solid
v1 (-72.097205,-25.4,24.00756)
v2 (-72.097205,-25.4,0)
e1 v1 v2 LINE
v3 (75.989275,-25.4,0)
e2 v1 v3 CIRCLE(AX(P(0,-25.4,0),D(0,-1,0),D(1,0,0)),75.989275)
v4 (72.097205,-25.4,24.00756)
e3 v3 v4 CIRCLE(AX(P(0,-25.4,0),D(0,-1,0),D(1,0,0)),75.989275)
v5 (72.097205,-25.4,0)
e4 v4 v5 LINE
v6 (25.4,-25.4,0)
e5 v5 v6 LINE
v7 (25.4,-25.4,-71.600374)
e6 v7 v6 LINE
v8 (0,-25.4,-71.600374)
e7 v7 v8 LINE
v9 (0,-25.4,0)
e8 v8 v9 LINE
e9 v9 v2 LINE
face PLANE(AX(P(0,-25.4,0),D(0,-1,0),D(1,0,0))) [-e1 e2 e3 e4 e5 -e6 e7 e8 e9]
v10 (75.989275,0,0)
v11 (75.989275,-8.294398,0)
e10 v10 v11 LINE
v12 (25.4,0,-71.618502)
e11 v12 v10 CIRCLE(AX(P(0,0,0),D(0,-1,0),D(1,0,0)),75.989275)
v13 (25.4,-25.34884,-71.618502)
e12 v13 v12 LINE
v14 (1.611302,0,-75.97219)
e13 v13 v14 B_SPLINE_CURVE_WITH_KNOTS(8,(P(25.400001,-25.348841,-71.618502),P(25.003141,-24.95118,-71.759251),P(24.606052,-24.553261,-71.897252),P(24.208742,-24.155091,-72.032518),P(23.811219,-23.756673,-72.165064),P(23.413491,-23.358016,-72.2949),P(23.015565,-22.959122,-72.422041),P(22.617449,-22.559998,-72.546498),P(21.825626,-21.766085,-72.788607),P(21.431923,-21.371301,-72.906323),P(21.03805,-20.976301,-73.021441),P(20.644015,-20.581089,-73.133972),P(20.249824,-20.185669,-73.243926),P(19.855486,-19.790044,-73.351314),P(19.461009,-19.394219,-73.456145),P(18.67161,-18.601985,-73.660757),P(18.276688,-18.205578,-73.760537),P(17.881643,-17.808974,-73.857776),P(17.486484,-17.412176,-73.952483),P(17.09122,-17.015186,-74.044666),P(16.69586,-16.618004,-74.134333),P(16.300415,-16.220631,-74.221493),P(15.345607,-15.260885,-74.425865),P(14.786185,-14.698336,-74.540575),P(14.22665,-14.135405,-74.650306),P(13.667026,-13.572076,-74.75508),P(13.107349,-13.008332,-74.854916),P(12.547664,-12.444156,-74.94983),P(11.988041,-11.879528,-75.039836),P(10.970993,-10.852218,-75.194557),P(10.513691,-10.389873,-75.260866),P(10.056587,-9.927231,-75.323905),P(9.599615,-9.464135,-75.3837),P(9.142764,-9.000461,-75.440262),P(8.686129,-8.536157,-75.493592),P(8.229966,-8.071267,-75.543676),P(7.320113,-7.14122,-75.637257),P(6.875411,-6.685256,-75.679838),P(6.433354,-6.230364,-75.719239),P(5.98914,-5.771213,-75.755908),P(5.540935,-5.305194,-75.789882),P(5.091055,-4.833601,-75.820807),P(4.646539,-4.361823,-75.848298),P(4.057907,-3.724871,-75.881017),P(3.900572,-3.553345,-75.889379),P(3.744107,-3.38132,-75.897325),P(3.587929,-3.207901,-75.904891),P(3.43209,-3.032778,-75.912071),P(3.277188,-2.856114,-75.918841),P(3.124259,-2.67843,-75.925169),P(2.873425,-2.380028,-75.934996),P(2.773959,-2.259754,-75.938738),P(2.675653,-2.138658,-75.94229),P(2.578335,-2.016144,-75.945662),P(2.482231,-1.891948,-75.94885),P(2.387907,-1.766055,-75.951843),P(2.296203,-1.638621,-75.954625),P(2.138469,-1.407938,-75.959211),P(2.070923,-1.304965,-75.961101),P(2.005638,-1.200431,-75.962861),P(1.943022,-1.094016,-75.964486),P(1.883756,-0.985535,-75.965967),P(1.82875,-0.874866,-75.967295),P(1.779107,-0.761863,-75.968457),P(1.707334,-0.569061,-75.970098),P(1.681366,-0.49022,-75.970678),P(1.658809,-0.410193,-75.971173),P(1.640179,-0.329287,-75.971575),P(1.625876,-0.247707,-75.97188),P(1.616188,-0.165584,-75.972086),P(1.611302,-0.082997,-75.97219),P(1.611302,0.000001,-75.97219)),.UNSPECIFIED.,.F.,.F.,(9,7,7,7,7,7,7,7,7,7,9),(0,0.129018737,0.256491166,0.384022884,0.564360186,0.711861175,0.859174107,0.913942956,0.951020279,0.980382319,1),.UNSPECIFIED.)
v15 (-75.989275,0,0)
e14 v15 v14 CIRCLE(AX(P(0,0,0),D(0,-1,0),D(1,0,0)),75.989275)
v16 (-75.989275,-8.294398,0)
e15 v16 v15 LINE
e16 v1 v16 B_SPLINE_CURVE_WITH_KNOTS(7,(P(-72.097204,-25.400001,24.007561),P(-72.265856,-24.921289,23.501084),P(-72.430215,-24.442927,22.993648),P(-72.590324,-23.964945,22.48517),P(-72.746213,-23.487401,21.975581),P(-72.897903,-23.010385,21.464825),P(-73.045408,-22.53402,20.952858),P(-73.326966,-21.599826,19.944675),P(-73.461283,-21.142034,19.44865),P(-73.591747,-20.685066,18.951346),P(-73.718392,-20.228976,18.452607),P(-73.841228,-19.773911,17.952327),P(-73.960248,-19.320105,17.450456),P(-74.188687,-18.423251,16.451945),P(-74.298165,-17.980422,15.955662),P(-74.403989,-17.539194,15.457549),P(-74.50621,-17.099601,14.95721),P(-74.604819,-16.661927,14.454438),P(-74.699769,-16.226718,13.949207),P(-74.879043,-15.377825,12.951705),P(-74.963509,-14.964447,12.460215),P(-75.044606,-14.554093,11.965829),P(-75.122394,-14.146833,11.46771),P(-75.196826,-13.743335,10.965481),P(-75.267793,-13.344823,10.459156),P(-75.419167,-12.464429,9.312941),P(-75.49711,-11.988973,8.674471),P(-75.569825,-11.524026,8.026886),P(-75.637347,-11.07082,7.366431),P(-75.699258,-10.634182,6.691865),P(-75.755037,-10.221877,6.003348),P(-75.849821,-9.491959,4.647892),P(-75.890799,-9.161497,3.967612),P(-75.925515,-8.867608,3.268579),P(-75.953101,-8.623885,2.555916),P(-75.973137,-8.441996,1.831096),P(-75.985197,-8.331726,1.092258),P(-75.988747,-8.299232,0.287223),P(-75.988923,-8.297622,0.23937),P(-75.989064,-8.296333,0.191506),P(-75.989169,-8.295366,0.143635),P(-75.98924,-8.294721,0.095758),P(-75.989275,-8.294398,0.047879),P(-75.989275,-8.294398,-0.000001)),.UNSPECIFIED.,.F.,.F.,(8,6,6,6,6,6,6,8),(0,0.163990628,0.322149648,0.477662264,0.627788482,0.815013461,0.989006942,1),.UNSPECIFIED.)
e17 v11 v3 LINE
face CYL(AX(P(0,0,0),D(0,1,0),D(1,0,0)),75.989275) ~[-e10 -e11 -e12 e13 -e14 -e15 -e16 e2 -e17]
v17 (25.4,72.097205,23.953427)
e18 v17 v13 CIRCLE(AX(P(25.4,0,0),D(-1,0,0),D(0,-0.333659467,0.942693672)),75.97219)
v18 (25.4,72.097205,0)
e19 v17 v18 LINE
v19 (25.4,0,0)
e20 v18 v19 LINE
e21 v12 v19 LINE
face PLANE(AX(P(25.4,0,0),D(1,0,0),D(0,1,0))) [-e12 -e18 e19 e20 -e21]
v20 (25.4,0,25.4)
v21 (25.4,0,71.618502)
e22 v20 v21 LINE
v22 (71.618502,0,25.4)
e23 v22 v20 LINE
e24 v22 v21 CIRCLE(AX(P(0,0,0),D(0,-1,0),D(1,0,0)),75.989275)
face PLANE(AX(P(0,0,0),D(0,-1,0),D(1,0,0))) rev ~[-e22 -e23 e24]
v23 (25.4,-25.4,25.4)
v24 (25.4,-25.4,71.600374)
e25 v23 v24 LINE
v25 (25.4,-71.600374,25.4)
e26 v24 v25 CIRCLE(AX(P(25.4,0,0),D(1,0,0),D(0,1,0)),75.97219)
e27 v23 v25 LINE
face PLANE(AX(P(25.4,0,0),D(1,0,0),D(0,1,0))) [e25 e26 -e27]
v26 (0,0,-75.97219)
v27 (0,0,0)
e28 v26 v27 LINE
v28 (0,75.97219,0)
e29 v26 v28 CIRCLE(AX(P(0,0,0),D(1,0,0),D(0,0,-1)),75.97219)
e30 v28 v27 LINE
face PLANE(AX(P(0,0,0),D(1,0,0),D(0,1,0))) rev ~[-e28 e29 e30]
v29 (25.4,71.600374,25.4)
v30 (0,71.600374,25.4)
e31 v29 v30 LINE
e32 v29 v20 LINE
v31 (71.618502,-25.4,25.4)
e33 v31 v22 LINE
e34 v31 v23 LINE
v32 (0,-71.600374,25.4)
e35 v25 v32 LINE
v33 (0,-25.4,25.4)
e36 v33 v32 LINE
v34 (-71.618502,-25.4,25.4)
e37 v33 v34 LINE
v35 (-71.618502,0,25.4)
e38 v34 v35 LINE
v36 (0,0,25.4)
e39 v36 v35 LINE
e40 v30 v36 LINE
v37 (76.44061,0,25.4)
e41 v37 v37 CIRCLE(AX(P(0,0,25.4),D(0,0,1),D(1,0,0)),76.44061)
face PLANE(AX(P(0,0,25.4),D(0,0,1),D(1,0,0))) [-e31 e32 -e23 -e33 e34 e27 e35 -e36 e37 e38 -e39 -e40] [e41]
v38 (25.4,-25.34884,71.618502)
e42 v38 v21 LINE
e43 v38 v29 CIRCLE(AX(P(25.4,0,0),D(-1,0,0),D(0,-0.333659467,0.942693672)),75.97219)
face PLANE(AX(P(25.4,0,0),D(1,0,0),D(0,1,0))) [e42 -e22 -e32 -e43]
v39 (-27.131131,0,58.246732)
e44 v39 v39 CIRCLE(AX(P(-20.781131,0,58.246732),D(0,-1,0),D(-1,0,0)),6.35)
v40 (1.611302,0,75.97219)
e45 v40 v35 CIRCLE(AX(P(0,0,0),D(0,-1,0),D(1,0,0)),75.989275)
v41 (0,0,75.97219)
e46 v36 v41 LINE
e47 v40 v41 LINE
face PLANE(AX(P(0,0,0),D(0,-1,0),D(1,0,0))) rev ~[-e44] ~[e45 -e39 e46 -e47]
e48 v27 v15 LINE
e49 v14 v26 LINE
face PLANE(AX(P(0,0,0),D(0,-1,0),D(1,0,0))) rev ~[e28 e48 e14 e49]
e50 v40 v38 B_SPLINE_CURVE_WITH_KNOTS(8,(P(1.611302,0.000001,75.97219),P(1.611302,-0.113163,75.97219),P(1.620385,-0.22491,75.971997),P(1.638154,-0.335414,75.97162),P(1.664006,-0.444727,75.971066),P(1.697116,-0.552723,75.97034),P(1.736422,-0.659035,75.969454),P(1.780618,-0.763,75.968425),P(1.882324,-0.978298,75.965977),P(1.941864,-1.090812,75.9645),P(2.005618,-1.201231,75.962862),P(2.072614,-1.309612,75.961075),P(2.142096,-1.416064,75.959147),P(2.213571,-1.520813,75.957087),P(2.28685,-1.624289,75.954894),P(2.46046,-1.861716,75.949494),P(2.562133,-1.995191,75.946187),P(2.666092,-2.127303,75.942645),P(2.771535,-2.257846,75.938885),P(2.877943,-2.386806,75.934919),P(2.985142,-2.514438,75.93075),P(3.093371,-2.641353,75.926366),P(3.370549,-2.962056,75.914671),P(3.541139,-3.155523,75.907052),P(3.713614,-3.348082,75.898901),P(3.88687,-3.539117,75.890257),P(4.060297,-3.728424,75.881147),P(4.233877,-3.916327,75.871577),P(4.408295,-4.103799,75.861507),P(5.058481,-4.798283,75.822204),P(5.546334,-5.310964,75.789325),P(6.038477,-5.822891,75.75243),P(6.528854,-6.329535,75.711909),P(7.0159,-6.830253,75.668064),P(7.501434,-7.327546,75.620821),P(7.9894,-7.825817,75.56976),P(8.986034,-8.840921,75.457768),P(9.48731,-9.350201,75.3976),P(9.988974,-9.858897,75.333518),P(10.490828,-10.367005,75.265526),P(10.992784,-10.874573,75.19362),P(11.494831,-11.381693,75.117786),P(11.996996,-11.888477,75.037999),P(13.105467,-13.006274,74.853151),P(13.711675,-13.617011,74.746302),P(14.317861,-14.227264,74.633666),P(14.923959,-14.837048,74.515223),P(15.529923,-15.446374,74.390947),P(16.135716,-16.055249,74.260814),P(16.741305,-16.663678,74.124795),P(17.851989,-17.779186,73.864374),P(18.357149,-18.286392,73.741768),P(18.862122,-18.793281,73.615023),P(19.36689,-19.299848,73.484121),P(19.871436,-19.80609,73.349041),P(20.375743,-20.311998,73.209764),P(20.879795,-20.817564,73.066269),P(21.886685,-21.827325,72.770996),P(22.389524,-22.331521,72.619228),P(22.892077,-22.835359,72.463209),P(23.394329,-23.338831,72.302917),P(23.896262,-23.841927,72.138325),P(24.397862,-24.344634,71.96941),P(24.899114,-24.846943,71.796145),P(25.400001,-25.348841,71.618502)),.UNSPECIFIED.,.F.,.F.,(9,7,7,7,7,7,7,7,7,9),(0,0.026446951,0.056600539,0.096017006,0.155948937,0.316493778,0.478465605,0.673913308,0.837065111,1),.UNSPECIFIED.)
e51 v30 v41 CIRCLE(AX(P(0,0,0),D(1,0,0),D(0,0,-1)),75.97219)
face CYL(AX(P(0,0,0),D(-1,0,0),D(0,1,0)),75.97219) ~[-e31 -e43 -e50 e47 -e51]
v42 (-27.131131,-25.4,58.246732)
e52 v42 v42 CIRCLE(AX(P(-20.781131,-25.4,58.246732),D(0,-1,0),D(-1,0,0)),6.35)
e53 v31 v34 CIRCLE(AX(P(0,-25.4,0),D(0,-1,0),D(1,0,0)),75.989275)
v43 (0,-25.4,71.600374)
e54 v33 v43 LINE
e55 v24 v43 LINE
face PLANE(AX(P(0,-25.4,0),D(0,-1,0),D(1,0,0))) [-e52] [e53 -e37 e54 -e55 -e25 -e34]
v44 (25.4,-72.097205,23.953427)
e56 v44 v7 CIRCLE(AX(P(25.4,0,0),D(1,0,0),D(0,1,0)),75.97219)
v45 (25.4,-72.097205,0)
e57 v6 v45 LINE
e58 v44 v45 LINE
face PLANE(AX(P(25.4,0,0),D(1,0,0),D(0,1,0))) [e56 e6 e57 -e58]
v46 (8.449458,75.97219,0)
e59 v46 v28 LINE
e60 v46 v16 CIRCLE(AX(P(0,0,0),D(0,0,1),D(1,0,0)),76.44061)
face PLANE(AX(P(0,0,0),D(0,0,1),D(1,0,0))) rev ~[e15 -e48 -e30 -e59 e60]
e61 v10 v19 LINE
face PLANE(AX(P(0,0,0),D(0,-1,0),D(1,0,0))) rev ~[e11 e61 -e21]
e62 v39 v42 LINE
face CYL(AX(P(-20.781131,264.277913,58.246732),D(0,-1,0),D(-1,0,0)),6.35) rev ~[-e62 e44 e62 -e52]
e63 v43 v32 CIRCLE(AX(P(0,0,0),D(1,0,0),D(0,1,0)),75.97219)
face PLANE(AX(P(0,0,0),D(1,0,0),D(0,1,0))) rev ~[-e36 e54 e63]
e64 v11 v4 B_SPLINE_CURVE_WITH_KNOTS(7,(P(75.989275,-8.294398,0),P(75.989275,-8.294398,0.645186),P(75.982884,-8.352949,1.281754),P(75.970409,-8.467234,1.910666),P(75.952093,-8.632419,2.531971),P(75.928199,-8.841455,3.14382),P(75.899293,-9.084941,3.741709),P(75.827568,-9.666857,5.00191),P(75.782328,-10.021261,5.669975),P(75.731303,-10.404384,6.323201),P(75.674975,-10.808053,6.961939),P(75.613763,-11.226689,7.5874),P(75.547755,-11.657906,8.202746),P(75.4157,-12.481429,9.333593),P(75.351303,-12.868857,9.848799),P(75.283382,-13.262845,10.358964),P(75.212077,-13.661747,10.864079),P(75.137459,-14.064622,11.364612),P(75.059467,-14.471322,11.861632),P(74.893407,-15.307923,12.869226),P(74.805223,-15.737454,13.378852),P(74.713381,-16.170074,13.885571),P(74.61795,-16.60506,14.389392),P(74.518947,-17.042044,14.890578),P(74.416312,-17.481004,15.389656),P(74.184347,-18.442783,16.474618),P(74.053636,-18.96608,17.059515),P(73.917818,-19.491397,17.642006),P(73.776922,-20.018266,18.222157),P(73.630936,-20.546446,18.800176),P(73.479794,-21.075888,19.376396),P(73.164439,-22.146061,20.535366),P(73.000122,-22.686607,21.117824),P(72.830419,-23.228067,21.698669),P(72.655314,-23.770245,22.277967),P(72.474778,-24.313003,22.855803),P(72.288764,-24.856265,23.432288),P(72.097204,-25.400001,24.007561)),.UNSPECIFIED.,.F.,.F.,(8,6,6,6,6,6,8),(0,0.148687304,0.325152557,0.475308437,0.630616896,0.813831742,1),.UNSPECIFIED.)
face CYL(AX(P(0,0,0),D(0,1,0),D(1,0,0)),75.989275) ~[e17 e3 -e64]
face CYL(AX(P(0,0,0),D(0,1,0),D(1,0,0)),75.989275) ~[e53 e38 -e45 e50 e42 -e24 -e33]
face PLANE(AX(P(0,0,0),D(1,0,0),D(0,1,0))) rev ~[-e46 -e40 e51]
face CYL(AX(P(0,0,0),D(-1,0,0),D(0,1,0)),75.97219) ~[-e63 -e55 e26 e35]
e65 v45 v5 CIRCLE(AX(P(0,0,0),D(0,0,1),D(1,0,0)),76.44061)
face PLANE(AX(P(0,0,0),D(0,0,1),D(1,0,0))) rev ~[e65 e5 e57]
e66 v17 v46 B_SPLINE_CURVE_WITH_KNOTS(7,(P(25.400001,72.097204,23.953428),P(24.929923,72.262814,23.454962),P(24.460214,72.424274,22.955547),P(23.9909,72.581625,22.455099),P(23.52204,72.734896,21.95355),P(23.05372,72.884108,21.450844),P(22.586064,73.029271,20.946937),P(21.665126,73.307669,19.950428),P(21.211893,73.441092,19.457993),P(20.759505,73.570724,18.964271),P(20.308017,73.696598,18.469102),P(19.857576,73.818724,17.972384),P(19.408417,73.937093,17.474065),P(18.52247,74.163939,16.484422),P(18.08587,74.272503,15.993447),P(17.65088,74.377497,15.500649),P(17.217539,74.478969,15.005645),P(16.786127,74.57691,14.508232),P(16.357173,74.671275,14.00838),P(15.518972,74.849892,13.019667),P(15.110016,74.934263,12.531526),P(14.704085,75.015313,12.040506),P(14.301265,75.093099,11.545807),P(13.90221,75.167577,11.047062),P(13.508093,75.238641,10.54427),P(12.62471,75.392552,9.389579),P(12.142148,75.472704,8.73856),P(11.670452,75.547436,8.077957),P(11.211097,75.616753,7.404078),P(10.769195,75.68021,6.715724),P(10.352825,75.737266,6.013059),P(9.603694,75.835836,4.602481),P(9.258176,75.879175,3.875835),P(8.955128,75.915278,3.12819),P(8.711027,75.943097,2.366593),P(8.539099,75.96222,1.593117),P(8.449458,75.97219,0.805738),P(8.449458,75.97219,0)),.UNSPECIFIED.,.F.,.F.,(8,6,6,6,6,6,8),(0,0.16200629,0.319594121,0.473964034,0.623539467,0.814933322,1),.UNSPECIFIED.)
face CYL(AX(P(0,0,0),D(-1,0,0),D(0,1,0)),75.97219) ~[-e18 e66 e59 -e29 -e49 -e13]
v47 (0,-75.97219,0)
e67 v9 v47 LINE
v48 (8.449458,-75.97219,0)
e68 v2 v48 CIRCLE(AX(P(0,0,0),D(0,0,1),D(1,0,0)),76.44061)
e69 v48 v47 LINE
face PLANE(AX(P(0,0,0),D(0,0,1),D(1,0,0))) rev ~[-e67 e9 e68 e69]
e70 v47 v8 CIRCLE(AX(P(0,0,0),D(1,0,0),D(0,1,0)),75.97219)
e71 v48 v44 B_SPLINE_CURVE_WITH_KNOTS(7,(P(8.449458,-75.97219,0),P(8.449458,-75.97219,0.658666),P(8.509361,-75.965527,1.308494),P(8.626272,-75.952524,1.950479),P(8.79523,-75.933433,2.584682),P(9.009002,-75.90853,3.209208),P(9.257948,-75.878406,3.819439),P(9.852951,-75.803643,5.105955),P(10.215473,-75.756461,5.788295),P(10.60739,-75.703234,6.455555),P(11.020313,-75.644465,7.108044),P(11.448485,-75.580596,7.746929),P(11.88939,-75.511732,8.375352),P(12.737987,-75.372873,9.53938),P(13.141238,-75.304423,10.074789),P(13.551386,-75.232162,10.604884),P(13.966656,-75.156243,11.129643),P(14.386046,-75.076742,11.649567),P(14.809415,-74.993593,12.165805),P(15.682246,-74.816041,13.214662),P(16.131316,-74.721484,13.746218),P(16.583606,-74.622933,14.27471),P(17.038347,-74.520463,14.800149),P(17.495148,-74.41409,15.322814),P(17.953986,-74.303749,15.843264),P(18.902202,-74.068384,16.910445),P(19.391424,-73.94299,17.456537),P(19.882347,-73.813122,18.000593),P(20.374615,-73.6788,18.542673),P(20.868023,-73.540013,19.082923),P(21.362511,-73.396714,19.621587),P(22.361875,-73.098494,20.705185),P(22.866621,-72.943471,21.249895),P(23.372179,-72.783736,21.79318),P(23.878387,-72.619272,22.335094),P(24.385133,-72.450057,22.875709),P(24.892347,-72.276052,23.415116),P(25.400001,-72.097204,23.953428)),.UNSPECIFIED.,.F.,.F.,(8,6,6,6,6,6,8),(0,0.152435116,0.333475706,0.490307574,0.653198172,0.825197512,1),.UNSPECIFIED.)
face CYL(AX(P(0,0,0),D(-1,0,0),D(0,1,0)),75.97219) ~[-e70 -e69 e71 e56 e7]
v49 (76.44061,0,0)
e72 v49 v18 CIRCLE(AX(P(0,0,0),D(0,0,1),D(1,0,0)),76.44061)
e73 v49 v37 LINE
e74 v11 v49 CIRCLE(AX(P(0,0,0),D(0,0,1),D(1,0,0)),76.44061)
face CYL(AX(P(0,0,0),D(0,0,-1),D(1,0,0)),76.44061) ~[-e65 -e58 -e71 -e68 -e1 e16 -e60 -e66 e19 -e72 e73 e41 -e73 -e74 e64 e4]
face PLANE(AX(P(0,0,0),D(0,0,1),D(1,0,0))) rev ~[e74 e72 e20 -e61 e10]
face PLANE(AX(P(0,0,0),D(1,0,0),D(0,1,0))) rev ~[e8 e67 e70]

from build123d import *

# Parameters (mm, degrees)
F0_R     = 75.9892747742
F1_DEPTH = 25.4
F2_R     = 75.972189553
F3_DEPTH = 25.4
F4_R     = 76.4406104517
F5_DEPTH = 25.4
F7_D     = 12.7


with BuildPart() as f1:
    # F0 (on Front) → F1 (new body)
    with BuildSketch(Plane.XZ):
        Circle(F0_R)
    extrude(amount=F1_DEPTH)

    # F2 (on Right) → F3 (join)
    with BuildSketch(Plane.YZ):
        Circle(F2_R)
    extrude(amount=F3_DEPTH)

    # F4 (on Top) → F5 (join)
    with BuildSketch(Plane.XY):
        Circle(F4_R)
    extrude(amount=F5_DEPTH)

    # F7 (through all)
    with Locations(Plane(origin=(0, 0, 0), x_dir=(1, 0, 0), z_dir=(0, 1, 0))):
        with Locations((-20.7811314613, -58.2467317581)):
            Hole(F7_D / 2)


solid = f1.part
